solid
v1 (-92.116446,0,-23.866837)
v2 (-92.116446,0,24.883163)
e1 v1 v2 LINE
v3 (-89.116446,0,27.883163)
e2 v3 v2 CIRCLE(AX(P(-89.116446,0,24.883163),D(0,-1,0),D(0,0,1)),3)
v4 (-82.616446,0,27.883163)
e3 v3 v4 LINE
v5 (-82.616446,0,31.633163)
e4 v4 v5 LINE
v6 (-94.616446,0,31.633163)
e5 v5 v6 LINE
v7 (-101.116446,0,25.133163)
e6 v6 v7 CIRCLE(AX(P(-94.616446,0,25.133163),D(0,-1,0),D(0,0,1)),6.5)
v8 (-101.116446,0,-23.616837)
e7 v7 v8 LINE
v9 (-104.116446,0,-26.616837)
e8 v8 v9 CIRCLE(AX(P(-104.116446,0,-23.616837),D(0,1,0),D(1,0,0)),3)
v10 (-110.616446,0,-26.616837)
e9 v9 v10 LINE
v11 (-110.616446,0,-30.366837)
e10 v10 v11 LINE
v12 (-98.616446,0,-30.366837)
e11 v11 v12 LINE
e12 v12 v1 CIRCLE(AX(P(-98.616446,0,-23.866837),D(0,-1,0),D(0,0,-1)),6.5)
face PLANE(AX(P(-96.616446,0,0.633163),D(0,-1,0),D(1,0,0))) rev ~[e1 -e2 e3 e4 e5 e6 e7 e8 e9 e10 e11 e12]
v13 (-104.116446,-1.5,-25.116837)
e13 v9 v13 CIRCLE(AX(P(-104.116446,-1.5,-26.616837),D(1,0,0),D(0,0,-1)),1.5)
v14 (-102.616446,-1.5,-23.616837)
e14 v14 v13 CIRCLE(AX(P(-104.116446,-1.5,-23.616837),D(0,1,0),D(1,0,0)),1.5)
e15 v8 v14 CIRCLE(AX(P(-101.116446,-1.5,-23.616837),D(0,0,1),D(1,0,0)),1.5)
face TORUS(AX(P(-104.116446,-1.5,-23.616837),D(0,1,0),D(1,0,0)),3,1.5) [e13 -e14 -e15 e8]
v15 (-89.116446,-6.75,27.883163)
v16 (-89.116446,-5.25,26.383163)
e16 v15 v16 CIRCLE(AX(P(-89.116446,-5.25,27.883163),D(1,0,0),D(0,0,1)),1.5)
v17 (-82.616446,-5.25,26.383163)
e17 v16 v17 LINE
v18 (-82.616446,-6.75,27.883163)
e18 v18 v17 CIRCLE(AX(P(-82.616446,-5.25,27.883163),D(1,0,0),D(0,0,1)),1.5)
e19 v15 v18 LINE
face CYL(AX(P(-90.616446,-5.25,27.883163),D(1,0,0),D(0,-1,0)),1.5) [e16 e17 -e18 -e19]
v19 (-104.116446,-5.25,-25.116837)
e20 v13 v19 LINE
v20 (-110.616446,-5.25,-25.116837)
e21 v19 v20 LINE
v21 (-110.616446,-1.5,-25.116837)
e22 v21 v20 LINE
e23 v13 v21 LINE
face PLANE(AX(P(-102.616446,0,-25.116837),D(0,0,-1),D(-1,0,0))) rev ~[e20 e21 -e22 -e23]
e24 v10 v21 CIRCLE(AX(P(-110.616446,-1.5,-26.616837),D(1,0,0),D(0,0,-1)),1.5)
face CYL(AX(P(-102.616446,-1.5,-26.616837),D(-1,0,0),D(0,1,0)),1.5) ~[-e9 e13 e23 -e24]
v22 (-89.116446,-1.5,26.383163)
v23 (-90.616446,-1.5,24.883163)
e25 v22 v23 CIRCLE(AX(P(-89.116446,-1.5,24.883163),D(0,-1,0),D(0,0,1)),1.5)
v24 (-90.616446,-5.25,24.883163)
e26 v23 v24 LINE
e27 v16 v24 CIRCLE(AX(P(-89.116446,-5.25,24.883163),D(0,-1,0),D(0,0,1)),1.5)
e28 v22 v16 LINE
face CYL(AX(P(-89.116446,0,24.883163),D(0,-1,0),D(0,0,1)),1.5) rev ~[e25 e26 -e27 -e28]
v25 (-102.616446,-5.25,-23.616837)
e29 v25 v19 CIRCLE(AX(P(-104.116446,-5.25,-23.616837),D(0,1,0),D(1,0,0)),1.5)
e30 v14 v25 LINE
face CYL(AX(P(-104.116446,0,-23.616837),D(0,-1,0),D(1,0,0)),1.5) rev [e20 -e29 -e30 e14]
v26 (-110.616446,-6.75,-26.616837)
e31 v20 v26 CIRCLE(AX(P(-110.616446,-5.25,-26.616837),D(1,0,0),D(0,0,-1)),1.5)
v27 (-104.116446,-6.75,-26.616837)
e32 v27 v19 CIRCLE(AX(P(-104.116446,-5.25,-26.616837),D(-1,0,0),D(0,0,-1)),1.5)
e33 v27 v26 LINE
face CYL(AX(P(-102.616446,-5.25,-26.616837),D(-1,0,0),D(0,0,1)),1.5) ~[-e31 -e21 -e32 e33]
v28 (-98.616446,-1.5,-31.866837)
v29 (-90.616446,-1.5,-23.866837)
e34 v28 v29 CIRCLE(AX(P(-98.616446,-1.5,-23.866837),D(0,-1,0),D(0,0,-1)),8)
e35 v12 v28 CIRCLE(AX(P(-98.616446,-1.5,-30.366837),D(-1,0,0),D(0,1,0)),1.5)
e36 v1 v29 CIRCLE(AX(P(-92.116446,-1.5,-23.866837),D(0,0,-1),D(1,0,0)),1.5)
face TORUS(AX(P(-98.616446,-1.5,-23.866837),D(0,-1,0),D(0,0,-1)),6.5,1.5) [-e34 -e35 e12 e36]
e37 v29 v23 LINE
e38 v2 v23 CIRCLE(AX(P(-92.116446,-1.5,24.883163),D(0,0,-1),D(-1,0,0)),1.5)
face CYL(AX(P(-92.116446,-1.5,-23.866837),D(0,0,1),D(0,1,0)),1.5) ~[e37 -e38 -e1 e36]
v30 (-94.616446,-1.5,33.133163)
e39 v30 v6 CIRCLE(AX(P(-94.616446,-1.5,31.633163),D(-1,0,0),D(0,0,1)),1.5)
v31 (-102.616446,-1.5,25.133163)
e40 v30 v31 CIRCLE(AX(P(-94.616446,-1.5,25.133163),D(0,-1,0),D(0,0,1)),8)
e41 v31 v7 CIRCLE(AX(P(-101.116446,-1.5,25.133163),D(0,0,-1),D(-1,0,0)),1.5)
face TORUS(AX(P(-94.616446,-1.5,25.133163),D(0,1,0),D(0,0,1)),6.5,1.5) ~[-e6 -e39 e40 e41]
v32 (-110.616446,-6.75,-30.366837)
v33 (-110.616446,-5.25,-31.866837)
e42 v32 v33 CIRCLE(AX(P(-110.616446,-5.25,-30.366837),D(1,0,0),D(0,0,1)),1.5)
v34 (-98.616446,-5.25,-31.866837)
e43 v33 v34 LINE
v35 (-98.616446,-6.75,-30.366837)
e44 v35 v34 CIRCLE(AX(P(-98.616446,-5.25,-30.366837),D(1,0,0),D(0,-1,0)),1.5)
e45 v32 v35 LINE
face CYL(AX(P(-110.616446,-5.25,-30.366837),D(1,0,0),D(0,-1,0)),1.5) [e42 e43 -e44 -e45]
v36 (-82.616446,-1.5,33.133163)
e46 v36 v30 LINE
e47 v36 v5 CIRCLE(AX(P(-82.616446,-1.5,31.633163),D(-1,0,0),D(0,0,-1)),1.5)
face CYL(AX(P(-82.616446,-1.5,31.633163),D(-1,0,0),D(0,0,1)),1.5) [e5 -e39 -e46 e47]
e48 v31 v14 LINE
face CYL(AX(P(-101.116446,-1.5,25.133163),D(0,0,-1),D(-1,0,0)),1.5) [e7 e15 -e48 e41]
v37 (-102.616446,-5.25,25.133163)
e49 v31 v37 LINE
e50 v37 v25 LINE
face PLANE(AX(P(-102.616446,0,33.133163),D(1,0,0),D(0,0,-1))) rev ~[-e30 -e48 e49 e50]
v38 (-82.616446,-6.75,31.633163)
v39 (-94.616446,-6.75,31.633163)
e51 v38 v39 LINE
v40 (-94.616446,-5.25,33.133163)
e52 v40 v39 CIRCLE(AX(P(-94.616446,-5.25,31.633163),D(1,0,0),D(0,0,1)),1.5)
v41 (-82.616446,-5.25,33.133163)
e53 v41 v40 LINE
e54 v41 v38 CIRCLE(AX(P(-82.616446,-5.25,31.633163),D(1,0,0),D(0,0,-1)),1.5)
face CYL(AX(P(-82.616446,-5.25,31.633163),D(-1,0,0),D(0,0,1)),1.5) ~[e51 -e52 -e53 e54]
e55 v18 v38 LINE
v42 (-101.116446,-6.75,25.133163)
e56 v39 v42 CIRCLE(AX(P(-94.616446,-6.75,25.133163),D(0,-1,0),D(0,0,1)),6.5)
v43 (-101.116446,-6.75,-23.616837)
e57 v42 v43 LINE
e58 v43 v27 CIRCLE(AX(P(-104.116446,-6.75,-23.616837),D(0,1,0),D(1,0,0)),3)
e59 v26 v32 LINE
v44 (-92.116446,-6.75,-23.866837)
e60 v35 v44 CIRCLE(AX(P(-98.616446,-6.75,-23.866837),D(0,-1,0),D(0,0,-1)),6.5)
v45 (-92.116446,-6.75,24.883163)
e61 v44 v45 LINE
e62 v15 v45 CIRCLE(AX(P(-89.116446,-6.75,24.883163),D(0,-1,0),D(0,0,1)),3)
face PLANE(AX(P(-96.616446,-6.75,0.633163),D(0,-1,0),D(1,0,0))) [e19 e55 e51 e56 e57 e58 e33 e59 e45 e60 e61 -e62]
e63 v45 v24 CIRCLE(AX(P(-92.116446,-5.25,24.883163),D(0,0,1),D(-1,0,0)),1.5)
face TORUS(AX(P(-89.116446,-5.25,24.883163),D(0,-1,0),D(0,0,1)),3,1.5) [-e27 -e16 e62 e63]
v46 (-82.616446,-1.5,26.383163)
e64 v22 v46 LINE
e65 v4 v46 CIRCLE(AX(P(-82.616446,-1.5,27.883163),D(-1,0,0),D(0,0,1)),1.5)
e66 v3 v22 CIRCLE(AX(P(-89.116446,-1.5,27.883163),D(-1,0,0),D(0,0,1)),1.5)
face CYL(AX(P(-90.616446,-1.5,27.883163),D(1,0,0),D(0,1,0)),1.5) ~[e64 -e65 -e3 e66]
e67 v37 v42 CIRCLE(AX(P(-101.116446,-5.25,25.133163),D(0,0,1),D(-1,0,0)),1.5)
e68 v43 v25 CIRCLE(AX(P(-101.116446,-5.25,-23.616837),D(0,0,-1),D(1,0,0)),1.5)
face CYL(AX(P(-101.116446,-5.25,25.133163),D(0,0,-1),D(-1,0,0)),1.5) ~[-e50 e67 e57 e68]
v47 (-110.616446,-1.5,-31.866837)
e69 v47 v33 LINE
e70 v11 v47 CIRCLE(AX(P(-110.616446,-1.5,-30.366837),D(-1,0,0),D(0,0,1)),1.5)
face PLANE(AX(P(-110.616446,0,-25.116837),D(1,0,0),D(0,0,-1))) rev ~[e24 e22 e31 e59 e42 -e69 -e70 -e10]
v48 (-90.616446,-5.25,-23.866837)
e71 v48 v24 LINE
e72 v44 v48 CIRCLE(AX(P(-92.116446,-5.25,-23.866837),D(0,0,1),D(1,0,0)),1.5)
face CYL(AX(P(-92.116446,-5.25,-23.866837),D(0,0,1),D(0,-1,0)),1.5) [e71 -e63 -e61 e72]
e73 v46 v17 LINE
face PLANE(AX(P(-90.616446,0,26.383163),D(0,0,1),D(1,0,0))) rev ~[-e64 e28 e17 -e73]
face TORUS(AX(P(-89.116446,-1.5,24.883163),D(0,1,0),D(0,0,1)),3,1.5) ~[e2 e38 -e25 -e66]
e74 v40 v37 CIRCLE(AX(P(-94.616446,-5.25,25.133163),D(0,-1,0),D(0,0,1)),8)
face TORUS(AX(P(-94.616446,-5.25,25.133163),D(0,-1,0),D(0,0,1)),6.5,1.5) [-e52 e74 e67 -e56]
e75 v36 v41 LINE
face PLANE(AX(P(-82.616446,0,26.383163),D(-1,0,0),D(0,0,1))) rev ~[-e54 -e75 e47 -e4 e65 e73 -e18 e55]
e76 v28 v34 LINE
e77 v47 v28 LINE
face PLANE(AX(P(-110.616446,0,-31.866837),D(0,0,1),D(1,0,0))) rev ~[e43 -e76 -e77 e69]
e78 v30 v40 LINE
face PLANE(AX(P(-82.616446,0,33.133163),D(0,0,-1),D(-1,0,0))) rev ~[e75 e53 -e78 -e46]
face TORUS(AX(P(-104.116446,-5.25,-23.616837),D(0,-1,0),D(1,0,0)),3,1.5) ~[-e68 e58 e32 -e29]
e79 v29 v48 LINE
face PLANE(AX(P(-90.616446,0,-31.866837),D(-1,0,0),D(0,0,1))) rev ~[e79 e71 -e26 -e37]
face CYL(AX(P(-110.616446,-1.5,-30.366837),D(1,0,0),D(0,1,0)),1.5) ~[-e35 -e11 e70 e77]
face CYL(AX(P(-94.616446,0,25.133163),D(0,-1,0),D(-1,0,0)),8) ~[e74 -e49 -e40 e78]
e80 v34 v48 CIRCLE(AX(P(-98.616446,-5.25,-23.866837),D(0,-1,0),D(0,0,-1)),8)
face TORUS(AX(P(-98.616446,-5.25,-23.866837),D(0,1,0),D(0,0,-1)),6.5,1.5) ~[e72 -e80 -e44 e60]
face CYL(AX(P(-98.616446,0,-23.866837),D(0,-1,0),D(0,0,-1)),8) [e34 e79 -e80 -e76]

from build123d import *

# Parameters (mm, degrees)
F1_DEPTH = 6.75
F2_R     = 8
F3_R     = 1.5


with BuildPart() as f1:
    # F0 (on Front) → F1 (new body)
    with BuildSketch(Plane.XZ):
        Polygon((-90.6164456464, 33.1331632659), (-102.6164456464, 33.1331632659), (-102.6164456464, 26.3831632659), (-102.6164456464, -25.1168367341), (-110.6164456464, -25.1168367341), (-110.6164456464, -31.8668367341), (-102.6164456464, -31.8668367341), (-90.6164456464, -31.8668367341), (-90.6164456464, -25.1168367341), (-90.6164456464, 26.3831632659), (-82.6164456464, 26.3831632659), (-82.6164456464, 33.1331632659), align=None)
    extrude(amount=F1_DEPTH)

    # F2
    f2_edges = [f1.edges().sort_by_distance(p)[0] for p in [
        (-102.616446, -3.375, 33.133163),
        (-90.616446, -3.375, -31.866837),
    ]]
    fillet(f2_edges, radius=F2_R)

    # F3
    f3_edges = [f1.edges().sort_by_distance(p)[0] for p in [
        (-102.616446, 0, 0.008163),
        (-106.616446, 0, -25.116837),
        (-102.616446, -6.75, 0.008163),
        (-106.616446, -6.75, -25.116837),
        (-102.616446, -3.375, -25.116837),
        (-104.616446, -6.75, -31.866837),
        (-104.616446, 0, -31.866837),
        (-90.616446, -3.375, 26.383163),
        (-100.2733, 0, 30.790018),
        (-88.616446, 0, 33.133163),
        (-86.616446, 0, 26.383163),
        (-92.959591, 0, -29.523691),
        (-90.616446, 0, 1.258163),
        (-100.2733, -6.75, 30.790018),
        (-88.616446, -6.75, 33.133163),
        (-86.616446, -6.75, 26.383163),
        (-92.959591, -6.75, -29.523691),
        (-90.616446, -6.75, 1.258163),
    ]]
    fillet(f3_edges, radius=F3_R)


solid = f1.part
